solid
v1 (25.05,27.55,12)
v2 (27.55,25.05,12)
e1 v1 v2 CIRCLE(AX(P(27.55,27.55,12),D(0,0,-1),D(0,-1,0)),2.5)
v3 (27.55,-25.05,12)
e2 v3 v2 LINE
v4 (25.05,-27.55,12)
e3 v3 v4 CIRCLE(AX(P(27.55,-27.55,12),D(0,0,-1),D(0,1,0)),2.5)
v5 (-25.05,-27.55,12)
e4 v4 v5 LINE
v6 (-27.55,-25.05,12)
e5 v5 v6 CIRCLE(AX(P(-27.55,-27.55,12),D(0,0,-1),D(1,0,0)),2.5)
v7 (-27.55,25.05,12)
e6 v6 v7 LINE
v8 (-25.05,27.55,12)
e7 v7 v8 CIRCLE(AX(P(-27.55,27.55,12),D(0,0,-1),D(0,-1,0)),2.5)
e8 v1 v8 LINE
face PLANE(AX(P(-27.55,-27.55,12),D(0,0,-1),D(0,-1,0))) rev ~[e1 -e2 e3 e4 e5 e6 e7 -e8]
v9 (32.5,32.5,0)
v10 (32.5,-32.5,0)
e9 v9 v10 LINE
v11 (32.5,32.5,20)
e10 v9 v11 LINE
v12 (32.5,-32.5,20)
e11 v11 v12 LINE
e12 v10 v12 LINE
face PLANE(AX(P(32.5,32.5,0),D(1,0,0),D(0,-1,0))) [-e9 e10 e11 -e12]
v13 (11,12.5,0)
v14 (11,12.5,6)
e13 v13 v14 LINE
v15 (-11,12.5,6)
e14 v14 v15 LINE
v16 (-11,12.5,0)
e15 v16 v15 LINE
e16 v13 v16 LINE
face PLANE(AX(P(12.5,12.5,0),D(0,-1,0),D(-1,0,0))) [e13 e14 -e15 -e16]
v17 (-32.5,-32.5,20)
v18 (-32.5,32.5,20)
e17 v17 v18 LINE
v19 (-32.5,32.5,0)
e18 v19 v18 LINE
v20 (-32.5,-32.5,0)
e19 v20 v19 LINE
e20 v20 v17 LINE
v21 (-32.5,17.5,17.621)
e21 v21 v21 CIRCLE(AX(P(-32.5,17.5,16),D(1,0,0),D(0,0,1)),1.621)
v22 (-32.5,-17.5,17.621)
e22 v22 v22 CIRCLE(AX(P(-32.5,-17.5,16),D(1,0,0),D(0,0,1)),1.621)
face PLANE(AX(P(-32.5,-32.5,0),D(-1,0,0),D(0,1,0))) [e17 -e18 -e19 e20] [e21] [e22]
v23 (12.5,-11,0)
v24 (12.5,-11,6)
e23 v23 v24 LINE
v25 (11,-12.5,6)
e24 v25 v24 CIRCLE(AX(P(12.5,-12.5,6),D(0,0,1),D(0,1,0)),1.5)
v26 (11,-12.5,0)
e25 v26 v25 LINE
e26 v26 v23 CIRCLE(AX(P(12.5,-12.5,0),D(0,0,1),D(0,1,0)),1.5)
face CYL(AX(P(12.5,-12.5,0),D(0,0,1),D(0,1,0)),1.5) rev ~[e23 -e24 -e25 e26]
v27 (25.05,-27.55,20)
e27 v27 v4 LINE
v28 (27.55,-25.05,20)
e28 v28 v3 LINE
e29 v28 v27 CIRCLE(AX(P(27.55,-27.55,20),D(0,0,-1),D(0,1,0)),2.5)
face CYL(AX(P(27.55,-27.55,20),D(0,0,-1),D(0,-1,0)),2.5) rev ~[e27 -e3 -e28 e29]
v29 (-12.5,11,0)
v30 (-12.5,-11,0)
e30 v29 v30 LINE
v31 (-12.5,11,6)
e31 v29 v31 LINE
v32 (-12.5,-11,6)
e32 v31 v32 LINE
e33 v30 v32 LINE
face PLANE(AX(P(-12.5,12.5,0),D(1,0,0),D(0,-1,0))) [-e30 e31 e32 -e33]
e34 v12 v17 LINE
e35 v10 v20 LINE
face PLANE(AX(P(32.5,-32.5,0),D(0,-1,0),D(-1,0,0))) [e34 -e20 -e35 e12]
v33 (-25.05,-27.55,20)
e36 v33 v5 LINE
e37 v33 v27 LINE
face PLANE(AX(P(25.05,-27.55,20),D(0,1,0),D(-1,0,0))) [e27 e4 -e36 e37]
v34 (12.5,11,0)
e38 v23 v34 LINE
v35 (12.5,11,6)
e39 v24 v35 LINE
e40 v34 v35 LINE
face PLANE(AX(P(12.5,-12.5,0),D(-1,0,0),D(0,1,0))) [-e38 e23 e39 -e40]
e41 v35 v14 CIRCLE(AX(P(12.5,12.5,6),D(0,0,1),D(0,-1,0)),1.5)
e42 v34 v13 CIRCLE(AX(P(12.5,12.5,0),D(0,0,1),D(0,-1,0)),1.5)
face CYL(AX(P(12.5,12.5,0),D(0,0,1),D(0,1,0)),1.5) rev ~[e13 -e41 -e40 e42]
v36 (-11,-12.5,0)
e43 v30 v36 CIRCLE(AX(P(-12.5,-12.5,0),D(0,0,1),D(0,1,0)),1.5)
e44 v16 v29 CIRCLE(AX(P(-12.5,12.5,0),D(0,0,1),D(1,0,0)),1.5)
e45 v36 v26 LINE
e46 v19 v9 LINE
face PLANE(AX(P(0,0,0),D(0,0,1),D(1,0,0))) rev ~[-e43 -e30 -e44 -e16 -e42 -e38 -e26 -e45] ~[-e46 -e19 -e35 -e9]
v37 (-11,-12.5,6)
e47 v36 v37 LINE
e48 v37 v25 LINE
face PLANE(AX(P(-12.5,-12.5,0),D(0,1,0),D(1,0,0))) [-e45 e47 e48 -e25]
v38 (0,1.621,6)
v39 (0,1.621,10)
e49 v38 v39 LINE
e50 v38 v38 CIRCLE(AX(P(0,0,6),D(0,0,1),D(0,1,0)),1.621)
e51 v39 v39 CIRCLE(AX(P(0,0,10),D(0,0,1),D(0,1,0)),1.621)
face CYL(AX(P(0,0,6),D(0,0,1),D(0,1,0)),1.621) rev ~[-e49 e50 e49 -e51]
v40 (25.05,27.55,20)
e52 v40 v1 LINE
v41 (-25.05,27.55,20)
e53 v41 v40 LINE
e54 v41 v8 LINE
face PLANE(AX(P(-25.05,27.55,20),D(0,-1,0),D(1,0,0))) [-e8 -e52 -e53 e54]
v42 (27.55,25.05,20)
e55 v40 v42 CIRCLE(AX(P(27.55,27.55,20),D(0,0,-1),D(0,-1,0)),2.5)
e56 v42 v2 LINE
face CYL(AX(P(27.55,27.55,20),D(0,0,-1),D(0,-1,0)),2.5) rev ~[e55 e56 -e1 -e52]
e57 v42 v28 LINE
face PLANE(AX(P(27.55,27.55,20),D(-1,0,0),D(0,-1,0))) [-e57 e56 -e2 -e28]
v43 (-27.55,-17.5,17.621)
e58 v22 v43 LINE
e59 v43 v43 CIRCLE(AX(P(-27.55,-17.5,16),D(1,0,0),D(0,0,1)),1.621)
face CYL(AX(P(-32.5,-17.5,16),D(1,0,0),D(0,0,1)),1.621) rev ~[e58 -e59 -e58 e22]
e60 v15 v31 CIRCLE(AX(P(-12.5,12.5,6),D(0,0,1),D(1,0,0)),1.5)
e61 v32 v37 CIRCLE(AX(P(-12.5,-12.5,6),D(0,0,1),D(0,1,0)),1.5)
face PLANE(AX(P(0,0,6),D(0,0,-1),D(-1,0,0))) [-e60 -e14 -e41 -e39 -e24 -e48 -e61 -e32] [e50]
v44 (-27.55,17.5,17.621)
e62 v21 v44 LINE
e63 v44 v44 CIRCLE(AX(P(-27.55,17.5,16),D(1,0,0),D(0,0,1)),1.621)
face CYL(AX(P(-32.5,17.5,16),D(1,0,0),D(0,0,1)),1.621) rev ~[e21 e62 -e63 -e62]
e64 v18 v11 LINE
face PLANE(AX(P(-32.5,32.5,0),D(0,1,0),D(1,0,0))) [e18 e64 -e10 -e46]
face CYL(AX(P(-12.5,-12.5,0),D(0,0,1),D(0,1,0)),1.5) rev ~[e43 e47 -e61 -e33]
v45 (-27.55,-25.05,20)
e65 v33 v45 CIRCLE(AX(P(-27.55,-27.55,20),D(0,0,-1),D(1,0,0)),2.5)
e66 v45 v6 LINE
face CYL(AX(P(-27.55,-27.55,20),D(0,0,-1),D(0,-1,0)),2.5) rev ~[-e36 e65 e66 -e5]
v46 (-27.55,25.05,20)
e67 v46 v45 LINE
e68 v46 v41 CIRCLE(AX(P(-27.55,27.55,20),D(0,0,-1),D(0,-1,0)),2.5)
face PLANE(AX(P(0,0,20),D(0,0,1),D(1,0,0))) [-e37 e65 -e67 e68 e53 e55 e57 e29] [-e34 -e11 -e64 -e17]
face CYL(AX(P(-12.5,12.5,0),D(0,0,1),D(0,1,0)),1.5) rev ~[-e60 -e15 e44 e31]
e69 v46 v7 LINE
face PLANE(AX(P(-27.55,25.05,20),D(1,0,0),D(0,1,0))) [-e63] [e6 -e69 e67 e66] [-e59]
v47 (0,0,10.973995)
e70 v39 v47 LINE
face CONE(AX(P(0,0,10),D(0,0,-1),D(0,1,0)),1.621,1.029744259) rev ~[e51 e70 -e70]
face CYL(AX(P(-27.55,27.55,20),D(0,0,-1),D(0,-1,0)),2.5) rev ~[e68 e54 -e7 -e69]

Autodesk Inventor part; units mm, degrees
ref_plane "YZ Plane" through (0, 0, 0) normal (1, 0, 0) x (0, 1, 0)
ref_plane "XZ Plane" through (0, 0, 0) normal (0, 1, 0) x (-1, 0, 0)
ref_plane "XY Plane" through (0, 0, 0) normal (0, 0, 1) x (1, 0, 0)
sketch "Sketch1" plane through (0, 0, 0) normal (0, 0, 1) x (1, 0, 0)
  line L0 (0, 45.5) -> (0, -45.5) construction
  line L1 (-45.5, 0) -> (45.5, 0) construction
  line L2 (-32.5, 32.5) -> (32.5, 32.5)
  line L3 (32.5, 32.5) -> (32.5, -32.5)
  line L4 (32.5, -32.5) -> (-32.5, -32.5)
  line L5 (-32.5, -32.5) -> (-32.5, 32.5)
  point P0 (0, 0)
  dimension "d0" = 65
  dimension "d1" = 65
extrude "Extrusion1" add sketch "Sketch1" along normal blind 20
sketch "Sketch4" plane through (0, 0, 20) normal (0, 0, 1) x (1, 0, 0)
  line L0 (-45.5, 0) -> (45.5, 0) construction
  line L1 (0, 45.5) -> (0, -45.5) construction
  line L2 (-27.55, 27.55) -> (27.55, 27.55) construction
  line L3 (27.55, 27.55) -> (27.55, -27.55) construction
  line L4 (27.55, -27.55) -> (-27.55, -27.55) construction
  line L5 (-27.55, -27.55) -> (-27.55, 27.55) construction
  point P0 (0, 0)
  dimension "d15" = 55.1
  dimension "d16" = 55.1
hole "Hole2" at (-27.55, 27.55, 20) at (27.55, 27.55, 20) at (27.55, -27.55, 20) at (-27.55, -27.55, 20) at (-27.55, 27.55, 20) at (27.55, 27.55, 20) direction (0, 0, -1) diameter 5 depth 8
sketch "Sketch5" plane through (0, 0, 20) normal (0, 0, 1) x (1, 0, 0)
  circle A0 centre (-27.55, 27.55) radius 2.5 projected
  circle A1 centre (27.55, -27.55) radius 2.5 projected
  line L0 (-27.55, 27.55) -> (27.55, 27.55)
  line L1 (27.55, 27.55) -> (27.55, -27.55)
  line L2 (27.55, -27.55) -> (-27.55, -27.55)
  line L3 (-27.55, -27.55) -> (-27.55, 27.55)
  point P0 (0, 0)
extrude "Extrusion3" cut sketch "Sketch5" against normal blind 8 contours L0 L1 A1 L2 L3 A0 | A0 L3 L0 | L1 L2 A1 picked at (-25.9042, 27.3646) picked at (27.003, -25.9868)
sketch "Sketch6" plane through (-32.5, -32.5, 0) normal (-1, 0, 0) x (0, 0, 1)
  line L0 (0, 65) -> (20, 65) projected
  line L1 (0, 0) -> (20, 0) projected
  line L2 (20, 7.45) -> (12, 7.45) construction
  line L3 (20, 57.55) -> (20, 7.45) construction
  line L4 (12, 57.55) -> (20, 57.55) construction
  line L5 (12, 7.45) -> (12, 57.55) construction
  line L6 (16, 57.55) -> (16, 7.45) construction
  point P0 (0, 32.5)
  point P1 (16, 50)
  point P2 (16, 15)
  dimension "d26" = 15
  dimension "d27" = 15
hole "Hole3" at (-32.5, 17.5, 16) at (-32.5, -17.5, 16) direction (1, 0, 0) diameter 3.242 end up to surface thread size "M4x0.7" class "6H" standard "ANSI Metric M Profile"
sketch "Sketch8" plane through (0, 0, 0) normal (0, 0, -1) x (-1, 0, 0)
  line L0 (32.5, 32.5) -> (-32.5, 32.5) construction
  line L1 (-32.5, 32.5) -> (-32.5, -32.5) construction
  line L2 (-32.5, -32.5) -> (32.5, -32.5) construction
  line L3 (32.5, -32.5) -> (32.5, 32.5) construction
  line L4 (0, -45.5) -> (0, 45.5) construction
  line L5 (-45.5, 0) -> (45.5, 0) construction
  line L6 (12.5, -12.5) -> (-12.5, -12.5)
  line L7 (-12.5, -12.5) -> (-12.5, 12.5)
  line L8 (-12.5, 12.5) -> (12.5, 12.5)
  line L9 (12.5, 12.5) -> (12.5, -12.5)
  point P0 (0, 0)
  dimension "d44" = 25
  dimension "d45" = 25
extrude "Extrusion4" cut sketch "Sketch8" against normal blind 6
sketch "Sketch9" plane through (0, 0, 0) normal (0, 0, -1) x (-1, 0, 0)
  line L0 (12.5, 12.5) -> (12.5, -12.5) construction
  line L1 (12.5, -12.5) -> (-12.5, -12.5) construction
  line L2 (-12.5, -12.5) -> (-12.5, 12.5) construction
  line L3 (-12.5, 12.5) -> (12.5, 12.5) construction
  line L4 (32.5, 32.5) -> (-32.5, 32.5) construction
  line L5 (-32.5, 32.5) -> (-32.5, -32.5) construction
  line L6 (-32.5, -32.5) -> (32.5, -32.5) construction
  line L7 (32.5, -32.5) -> (32.5, 32.5) construction
  line L8 (12.5, -12.5) -> (-12.5, -12.5) construction
  point P0 (0, 0)
hole "Hole5" at (-12.5, -12.5, 0) at (12.5, -12.5, 0) at (12.5, 12.5, 0) at (-12.5, 12.5, 0) direction (0, 0, 1) diameter 3 depth 6
sketch "Sketch10" plane through (0, 0, 6) normal (0, 0, -1) x (-1, 0, 0)
  point P0 (0, 0)
  point P1 (0, 0)
hole "Hole6" at (0, 0, 6) direction (0, 0, 1) diameter 3.242 depth 4 tip angle 118 thread size "M4x0.7" class "6H" standard "ANSI Metric M Profile"
properties part number "Large-cuvette-mount-50mm-V3" material "PC/ABS Plastic"
